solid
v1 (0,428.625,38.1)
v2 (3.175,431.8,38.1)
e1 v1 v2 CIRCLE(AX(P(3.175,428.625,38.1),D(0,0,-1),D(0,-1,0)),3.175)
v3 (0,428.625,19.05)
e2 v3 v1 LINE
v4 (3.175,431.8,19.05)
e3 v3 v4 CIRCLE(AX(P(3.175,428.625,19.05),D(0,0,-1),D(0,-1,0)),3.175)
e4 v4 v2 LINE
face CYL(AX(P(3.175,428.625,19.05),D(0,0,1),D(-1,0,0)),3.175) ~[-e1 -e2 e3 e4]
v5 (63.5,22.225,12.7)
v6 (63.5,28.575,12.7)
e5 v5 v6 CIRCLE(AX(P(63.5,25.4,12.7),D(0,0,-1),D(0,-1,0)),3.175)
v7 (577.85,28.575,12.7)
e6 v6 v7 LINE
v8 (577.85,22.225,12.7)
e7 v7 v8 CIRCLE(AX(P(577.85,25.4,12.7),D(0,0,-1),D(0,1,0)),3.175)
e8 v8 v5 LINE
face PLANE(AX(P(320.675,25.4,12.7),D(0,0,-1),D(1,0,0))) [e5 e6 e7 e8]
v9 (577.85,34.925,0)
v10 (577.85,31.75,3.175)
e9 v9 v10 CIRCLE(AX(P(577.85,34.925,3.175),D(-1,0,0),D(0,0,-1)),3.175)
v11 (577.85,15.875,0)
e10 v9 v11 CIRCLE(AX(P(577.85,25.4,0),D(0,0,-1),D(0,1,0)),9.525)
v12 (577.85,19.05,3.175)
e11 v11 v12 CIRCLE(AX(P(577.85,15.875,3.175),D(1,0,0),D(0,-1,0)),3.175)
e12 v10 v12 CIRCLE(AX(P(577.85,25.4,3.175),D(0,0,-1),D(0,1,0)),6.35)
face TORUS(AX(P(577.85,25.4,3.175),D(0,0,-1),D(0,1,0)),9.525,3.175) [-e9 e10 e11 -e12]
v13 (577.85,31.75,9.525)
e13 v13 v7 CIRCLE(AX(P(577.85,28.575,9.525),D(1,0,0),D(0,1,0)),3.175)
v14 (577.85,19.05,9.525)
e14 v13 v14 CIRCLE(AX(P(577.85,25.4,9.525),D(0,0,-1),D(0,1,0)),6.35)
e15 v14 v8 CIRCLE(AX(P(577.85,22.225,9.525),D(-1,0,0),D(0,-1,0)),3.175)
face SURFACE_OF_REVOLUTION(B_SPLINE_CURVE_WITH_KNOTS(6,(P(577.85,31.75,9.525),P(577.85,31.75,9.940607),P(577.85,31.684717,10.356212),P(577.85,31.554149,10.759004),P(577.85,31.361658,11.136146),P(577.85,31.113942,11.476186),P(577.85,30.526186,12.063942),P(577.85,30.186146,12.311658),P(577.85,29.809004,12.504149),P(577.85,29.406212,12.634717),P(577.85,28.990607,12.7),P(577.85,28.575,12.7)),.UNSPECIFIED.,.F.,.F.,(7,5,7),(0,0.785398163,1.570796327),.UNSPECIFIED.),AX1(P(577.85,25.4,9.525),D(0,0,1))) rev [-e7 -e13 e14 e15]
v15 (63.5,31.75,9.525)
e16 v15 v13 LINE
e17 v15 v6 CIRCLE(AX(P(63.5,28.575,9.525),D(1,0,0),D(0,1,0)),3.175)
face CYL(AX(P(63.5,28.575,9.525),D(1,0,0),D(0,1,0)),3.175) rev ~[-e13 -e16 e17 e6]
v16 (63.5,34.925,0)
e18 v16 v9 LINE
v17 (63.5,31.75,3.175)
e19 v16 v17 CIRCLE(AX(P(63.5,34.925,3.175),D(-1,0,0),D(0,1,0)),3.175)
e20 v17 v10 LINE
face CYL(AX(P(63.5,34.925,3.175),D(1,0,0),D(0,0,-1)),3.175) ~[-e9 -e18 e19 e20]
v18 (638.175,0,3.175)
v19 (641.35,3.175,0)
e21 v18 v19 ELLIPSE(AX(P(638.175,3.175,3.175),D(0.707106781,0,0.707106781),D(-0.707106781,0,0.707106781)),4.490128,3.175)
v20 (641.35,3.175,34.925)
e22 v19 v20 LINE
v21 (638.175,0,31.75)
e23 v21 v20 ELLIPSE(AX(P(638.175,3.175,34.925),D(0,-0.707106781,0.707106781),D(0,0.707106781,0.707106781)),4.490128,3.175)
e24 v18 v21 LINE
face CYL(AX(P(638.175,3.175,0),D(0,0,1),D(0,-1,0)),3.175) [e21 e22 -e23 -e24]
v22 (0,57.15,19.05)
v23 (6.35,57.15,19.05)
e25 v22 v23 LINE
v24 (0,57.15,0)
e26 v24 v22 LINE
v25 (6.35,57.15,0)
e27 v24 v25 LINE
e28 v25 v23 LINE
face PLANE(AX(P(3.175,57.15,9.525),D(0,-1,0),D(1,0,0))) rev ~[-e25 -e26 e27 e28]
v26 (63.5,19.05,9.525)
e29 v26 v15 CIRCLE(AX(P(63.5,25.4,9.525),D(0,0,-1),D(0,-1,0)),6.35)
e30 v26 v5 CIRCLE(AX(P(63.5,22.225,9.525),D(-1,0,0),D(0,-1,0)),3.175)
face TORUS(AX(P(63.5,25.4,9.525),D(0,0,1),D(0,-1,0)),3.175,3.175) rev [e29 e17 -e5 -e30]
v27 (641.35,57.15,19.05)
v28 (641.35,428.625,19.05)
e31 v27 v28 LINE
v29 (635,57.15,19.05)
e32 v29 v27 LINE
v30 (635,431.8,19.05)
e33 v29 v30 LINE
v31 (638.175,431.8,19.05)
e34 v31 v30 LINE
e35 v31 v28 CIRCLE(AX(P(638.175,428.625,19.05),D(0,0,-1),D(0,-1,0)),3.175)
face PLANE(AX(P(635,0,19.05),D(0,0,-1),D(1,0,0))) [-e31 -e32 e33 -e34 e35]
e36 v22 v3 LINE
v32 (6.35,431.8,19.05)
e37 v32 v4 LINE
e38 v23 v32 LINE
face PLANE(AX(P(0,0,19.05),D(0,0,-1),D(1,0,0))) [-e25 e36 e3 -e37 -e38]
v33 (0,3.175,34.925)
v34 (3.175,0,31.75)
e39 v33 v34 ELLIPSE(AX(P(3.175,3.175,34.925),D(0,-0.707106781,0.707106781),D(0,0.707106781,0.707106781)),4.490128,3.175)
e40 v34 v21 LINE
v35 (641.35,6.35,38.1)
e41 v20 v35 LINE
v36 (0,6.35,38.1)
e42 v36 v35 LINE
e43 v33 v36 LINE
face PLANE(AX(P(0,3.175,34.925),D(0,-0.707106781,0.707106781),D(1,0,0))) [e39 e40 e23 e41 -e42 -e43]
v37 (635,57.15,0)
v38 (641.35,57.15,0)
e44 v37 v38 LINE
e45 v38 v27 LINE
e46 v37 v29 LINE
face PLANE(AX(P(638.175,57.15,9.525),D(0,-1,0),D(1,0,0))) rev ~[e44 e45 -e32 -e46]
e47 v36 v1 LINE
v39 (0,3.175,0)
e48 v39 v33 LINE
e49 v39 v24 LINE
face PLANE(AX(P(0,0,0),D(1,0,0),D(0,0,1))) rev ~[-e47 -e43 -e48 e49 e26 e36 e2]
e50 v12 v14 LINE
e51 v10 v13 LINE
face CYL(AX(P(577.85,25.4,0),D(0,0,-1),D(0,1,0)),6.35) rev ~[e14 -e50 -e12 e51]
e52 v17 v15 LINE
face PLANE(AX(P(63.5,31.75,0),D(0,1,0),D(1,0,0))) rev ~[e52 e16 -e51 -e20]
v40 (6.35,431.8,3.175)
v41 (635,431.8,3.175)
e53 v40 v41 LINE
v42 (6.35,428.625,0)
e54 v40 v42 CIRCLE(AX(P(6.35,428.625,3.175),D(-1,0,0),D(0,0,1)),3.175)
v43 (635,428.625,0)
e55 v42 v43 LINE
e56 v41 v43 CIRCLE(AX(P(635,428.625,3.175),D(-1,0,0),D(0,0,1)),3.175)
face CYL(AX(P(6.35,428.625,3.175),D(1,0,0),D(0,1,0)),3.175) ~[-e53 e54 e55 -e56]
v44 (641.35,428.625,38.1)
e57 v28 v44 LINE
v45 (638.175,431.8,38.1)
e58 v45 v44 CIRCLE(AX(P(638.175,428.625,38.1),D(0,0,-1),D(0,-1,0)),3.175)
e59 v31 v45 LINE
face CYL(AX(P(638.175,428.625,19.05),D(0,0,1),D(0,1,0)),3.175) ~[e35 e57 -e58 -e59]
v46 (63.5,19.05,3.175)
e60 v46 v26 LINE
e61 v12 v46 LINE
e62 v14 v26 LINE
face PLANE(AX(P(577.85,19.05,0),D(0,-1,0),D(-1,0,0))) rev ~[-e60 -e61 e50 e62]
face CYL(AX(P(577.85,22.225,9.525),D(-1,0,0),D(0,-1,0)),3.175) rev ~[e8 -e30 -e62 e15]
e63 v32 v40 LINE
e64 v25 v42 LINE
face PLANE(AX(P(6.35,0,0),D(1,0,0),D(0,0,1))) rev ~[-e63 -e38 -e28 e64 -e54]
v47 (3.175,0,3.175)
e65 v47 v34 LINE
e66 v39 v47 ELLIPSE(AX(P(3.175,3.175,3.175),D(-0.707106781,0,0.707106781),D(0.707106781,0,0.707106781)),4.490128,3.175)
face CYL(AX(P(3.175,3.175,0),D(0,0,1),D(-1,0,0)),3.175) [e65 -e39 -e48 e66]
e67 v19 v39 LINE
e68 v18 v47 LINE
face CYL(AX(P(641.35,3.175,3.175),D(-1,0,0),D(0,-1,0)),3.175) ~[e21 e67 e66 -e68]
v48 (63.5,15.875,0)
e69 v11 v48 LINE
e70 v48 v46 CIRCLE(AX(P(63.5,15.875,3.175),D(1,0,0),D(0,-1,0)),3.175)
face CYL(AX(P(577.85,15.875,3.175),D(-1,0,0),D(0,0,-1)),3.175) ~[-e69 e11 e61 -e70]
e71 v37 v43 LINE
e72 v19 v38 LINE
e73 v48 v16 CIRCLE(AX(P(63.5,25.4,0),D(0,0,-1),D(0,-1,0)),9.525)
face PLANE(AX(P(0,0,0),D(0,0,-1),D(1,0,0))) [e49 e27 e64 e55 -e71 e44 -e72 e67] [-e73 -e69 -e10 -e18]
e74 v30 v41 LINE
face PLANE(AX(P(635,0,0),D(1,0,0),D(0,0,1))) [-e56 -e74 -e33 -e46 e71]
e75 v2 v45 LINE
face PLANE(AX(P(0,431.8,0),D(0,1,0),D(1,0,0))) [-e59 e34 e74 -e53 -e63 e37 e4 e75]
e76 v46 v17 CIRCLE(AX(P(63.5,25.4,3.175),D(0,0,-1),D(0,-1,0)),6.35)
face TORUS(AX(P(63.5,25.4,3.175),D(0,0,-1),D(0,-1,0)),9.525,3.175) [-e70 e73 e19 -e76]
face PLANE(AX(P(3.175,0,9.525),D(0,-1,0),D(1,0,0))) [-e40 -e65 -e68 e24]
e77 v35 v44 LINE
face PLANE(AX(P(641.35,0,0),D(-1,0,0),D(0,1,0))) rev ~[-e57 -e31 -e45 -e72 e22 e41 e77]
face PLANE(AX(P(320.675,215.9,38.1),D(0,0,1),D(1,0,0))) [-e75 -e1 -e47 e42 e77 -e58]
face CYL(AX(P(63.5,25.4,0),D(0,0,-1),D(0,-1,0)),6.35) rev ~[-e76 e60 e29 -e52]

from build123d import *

# Parameters (mm, degrees)
F0_W     = 641.35
F0_H     = 431.8
F1_DEPTH = 38.1
F2_W     = 6.35
F2_H     = 19.05
F3_DEPTH = 431.801
F4_DEPTH = 57.15
F5_SIZE  = 6.35
F7_DEPTH = 12.7
F8_R     = 3.175


with BuildPart() as f1:
    # F0 (on Top) → F1 (new body)
    with BuildSketch(Plane.XY):
        with Locations((320.675, 215.9)):
            Rectangle(F0_W, F0_H)
    extrude(amount=F1_DEPTH)

    # F2 (on face) → F3 (cut, through all)
    with BuildSketch(Plane.XZ):
        with Locations((3.175, 9.525)):
            Rectangle(F2_W, F2_H)
        with Locations((638.175, 9.525)):
            Rectangle(F2_W, F2_H)
    extrude(amount=-F3_DEPTH, mode=Mode.SUBTRACT)

    # F2 (on face) → F4 (join)
    with BuildSketch(Plane.XZ):
        with Locations((3.175, 9.525)):
            Rectangle(F2_W, F2_H)
        with Locations((638.175, 9.525)):
            Rectangle(F2_W, F2_H)
    extrude(amount=-F4_DEPTH)

    # F5
    f5_edges = [f1.edges().sort_by_distance(p)[0] for p in [
        (320.675, 0, 38.1),
    ]]
    chamfer(f5_edges, length=F5_SIZE)

    # F6 (on face) → F7 (cut)
    with BuildSketch(Plane(origin=(0, 0, 0), x_dir=(1, 0, 0), z_dir=(0, 0, -1))):
        with BuildLine():
            Line((577.85, -19.05), (63.5, -19.05))
            ThreePointArc((63.5, -19.05), (57.15, -25.4), (63.5, -31.75))
            Line((63.5, -31.75), (577.85, -31.75))
            ThreePointArc((577.85, -31.75), (584.2, -25.4), (577.85, -19.05))
        make_face()
    extrude(amount=-F7_DEPTH, mode=Mode.SUBTRACT)

    # F8
    f8_edges = [f1.edges().sort_by_distance(p)[0] for p in [
        (0, 0, 15.875),
        (320.675, 0, 0),
        (641.35, 0, 15.875),
        (320.675, 431.8, 0),
        (57.15, 25.4, 0),
        (57.15, 25.4, 12.7),
        (0, 431.8, 28.575),
        (641.35, 431.8, 28.575),
        (320.675, 19.05, 0),
        (320.675, 31.75, 0),
        (584.2, 25.4, 0),
        (320.675, 19.05, 12.7),
        (320.675, 31.75, 12.7),
        (584.2, 25.4, 12.7),
    ]]
    fillet(f8_edges, radius=F8_R)


solid = f1.part
